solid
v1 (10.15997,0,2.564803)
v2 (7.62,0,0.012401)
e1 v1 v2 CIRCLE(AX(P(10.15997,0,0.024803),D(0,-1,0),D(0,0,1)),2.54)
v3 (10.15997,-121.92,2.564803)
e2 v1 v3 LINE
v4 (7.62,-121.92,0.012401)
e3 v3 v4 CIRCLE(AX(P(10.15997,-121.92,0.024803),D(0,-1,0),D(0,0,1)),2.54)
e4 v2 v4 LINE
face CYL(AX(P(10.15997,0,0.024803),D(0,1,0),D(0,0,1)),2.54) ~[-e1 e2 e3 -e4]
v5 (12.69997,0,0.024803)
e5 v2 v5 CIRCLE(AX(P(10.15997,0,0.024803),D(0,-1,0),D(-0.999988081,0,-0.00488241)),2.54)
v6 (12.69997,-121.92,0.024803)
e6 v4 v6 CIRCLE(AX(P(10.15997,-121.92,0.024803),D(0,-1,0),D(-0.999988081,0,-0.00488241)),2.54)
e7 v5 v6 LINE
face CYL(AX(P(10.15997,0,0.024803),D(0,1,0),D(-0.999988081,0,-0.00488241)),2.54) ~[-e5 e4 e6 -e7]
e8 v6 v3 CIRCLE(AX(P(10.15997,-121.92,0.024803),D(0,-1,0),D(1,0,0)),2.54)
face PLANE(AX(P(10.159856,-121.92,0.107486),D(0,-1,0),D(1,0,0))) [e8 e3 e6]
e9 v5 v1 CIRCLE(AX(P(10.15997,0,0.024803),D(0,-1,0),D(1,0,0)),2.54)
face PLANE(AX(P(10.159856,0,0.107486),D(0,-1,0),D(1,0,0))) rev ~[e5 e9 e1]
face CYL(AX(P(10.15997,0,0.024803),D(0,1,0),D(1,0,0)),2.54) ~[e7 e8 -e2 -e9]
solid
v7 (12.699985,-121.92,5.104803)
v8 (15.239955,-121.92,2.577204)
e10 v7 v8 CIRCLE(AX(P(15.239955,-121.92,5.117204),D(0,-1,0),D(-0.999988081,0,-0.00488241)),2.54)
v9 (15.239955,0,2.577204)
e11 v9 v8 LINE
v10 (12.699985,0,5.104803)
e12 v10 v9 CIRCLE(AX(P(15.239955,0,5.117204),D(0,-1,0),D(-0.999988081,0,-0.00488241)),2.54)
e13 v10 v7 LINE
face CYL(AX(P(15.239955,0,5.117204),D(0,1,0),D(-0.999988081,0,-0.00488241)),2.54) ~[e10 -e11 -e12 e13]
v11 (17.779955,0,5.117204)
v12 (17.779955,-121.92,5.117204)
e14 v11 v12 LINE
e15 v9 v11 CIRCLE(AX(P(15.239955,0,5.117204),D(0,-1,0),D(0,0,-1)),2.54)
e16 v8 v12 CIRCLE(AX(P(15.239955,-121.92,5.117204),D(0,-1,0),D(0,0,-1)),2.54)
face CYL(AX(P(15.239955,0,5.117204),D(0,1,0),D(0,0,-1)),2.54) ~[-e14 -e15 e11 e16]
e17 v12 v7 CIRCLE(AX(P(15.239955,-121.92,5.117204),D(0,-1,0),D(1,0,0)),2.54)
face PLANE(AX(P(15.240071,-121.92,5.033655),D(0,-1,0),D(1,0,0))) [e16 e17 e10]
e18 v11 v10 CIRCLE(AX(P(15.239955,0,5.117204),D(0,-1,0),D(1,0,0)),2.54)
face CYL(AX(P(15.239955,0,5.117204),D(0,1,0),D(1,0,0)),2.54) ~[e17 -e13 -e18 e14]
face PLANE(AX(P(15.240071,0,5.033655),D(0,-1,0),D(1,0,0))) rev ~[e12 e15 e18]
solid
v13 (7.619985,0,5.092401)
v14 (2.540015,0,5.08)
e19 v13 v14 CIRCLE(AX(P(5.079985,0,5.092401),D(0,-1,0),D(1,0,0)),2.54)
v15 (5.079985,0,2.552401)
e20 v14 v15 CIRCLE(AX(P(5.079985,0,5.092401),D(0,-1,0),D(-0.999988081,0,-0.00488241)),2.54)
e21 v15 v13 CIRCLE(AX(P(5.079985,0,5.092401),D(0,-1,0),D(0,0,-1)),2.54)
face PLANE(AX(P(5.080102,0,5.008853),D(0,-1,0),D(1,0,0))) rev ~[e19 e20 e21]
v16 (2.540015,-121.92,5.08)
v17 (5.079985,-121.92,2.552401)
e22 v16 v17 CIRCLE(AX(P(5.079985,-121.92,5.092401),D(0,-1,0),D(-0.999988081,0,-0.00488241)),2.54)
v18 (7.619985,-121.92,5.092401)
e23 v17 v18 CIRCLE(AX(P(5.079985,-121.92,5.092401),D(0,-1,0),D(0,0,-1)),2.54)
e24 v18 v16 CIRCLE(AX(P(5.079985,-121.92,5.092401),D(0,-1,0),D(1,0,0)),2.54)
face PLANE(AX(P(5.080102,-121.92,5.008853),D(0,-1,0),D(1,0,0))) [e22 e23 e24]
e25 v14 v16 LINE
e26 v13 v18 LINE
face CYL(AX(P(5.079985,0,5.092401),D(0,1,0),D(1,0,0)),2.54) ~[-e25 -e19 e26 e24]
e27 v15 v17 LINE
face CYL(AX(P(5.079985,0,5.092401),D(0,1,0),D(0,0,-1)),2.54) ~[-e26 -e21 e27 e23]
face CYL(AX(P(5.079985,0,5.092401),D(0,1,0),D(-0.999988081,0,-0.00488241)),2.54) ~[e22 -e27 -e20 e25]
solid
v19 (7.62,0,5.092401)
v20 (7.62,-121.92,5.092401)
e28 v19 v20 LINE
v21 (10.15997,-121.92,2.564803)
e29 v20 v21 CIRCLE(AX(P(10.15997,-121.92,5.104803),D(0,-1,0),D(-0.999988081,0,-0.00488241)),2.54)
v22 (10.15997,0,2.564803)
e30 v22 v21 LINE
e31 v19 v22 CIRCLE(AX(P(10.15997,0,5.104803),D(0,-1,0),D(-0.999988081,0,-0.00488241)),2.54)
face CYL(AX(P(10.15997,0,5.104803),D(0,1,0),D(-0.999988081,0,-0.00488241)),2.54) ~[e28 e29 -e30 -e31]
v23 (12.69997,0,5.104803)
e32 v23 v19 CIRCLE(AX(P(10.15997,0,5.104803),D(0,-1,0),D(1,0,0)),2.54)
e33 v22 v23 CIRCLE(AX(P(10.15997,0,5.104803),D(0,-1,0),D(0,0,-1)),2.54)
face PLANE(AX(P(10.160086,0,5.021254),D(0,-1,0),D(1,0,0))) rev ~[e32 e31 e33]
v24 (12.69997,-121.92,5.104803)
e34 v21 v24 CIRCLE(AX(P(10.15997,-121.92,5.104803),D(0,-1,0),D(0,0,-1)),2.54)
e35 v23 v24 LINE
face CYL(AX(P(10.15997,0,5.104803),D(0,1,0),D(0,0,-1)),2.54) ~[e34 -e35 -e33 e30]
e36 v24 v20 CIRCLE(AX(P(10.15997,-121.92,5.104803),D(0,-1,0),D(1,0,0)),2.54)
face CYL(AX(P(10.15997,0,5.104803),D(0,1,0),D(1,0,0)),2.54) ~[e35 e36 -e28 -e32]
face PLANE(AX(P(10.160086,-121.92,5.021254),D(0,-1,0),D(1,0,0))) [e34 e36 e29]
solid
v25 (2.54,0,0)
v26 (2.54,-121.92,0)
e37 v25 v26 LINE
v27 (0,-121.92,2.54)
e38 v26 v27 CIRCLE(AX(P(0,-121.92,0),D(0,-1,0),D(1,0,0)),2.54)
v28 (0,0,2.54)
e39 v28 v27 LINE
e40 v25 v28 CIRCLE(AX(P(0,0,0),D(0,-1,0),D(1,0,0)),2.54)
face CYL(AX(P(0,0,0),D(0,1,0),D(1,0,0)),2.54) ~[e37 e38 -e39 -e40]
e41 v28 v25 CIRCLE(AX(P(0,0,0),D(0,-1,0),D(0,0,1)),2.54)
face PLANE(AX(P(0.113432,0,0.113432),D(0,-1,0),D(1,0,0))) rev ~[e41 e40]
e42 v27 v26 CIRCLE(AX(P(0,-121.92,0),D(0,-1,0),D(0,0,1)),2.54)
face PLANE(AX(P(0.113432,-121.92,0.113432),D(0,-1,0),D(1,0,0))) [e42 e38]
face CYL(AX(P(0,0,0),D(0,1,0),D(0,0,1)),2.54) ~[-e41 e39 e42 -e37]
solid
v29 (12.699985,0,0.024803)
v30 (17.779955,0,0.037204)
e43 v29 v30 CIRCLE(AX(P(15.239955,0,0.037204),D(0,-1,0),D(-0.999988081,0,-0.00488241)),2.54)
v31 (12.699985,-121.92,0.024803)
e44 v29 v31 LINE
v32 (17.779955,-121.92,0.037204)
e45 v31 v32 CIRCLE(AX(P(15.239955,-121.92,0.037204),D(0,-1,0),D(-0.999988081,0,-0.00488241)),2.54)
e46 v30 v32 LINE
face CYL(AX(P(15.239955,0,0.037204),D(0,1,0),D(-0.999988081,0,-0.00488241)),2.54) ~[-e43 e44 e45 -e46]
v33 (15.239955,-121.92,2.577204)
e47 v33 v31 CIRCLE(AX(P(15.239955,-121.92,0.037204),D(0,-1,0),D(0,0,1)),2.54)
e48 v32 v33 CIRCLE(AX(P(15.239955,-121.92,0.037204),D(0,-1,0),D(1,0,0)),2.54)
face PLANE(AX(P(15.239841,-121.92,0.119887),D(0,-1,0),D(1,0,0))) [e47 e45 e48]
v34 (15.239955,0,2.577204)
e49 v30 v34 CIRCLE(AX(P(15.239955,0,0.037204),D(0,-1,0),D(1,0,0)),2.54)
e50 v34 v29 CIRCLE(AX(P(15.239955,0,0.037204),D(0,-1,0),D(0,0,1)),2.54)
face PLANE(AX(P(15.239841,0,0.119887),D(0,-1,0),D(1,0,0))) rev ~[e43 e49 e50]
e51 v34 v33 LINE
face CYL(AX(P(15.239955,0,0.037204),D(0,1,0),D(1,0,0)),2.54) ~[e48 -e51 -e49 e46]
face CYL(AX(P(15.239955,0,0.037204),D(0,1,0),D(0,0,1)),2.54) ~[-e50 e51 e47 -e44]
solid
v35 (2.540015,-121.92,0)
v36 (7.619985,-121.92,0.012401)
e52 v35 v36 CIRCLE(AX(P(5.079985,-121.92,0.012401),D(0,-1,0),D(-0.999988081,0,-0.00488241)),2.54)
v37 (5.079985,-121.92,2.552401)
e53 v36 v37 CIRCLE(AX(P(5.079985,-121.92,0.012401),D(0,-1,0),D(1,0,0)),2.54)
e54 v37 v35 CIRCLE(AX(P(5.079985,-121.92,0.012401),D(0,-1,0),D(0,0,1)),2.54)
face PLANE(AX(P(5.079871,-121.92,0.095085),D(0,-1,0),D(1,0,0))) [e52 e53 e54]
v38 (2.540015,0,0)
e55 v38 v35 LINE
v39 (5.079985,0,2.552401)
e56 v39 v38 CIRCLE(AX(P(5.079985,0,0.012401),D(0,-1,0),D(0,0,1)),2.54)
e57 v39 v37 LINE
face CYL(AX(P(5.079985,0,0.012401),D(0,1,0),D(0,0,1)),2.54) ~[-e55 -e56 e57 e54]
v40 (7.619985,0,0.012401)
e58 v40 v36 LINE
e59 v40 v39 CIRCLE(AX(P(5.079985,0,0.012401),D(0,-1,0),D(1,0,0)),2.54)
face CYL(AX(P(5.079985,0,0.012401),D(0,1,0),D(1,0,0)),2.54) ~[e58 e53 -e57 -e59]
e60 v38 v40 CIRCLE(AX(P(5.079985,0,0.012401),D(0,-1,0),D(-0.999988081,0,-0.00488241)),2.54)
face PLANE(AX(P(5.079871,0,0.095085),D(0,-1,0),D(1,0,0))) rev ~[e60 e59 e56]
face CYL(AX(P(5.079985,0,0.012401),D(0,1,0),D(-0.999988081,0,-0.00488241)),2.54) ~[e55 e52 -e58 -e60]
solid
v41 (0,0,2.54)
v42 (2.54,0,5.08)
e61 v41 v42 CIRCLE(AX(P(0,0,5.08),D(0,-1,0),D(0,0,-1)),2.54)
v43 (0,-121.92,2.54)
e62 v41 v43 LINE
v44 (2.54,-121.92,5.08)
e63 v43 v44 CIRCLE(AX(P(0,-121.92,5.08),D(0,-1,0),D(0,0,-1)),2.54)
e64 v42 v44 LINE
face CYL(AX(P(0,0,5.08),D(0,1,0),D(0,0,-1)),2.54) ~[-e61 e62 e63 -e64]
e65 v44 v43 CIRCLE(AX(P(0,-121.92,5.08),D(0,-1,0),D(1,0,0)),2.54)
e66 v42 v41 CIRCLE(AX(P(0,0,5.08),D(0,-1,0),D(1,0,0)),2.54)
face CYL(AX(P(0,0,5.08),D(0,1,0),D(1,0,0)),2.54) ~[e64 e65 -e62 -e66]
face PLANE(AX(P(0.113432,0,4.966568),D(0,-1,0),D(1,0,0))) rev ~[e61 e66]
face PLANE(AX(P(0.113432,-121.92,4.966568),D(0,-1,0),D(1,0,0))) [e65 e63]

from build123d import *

# Parameters (mm, degrees)
F1_DEPTH = 121.92


with BuildPart() as f1:
    # F0 (on Front) → F1 (new body)
    with BuildSketch(Plane.XZ):
        with BuildLine():
            ThreePointArc((0, 2.54), (-1.7960512242, -1.7960512242), (2.54, 0))
            ThreePointArc((2.54, 0), (1.7960512242, 1.7960512242), (0, 2.54))
        make_face()
    extrude(amount=F1_DEPTH)


with BuildPart() as f1b:
    # F0 (on Front) → F1, piece 2 (new body)
    with BuildSketch(Plane.XZ):
        with BuildLine():
            ThreePointArc((2.54, 5.08), (-1.7960512242, 6.8760512242), (0, 2.54))
            ThreePointArc((0, 2.54), (1.7960512242, 3.2839487758), (2.54, 5.08))
        make_face()
    extrude(amount=F1_DEPTH)


with BuildPart() as f1c:
    # F0 (on Front) → F1, piece 3 (new body)
    with BuildSketch(Plane.XZ):
        with BuildLine():
            ThreePointArc((15.2399545881, 2.577204187), (13.4395241733, 1.828865517), (12.6999848625, 0.0248028653))
            ThreePointArc((12.6999848625, 0.0248028653), (15.2461552675, -2.5027882444), (17.7799545881, 0.037204187))
            ThreePointArc((17.7799545881, 0.037204187), (17.0360058124, 1.8332554112), (15.2399545881, 2.577204187))
        make_face()
    extrude(amount=F1_DEPTH)


with BuildPart() as f1d:
    # F0 (on Front) → F1, piece 4 (new body)
    with BuildSketch(Plane.XZ):
        with BuildLine():
            ThreePointArc((12.6999848625, 5.1048028653), (13.4482932582, 3.3167737722), (15.2399545881, 2.577204187))
            ThreePointArc((15.2399545881, 2.577204187), (17.0360058124, 3.3211529628), (17.7799545881, 5.117204187))
            ThreePointArc((17.7799545881, 5.117204187), (15.2337539088, 7.6571966184), (12.6999848625, 5.1048028653))
        make_face()
    extrude(amount=F1_DEPTH)


with BuildPart() as f1e:
    # F0 (on Front) → F1, piece 5 (new body)
    with BuildSketch(Plane.XZ):
        with BuildLine():
            ThreePointArc((5.0799848627, 2.5524013957), (3.2795544479, 1.8040627257), (2.5400151371, 7.39e-08))
            ThreePointArc((2.5400151371, 7.39e-08), (5.0861855421, -2.5275910357), (7.6199848627, 0.0124013957))
            ThreePointArc((7.6199848627, 0.0124013957), (6.8760360869, 1.8084526199), (5.0799848627, 2.5524013957))
        make_face()
    extrude(amount=F1_DEPTH)


with BuildPart() as f1f:
    # F0 (on Front) → F1, piece 6 (new body)
    with BuildSketch(Plane.XZ):
        with BuildLine():
            ThreePointArc((2.5400151371, 5.0800000739), (3.2883235327, 3.2919709808), (5.0799848627, 2.5524013957))
            ThreePointArc((5.0799848627, 2.5524013957), (6.8760360869, 3.2963501715), (7.6199848627, 5.0924013957))
            ThreePointArc((7.6199848627, 5.0924013957), (5.0737841834, 7.6323938271), (2.5400151371, 5.0800000739))
        make_face()
    extrude(amount=F1_DEPTH)


with BuildPart() as f1g:
    # F0 (on Front) → F1, piece 7 (new body)
    with BuildSketch(Plane.XZ):
        with BuildLine():
            ThreePointArc((10.1599697254, 2.5648027913), (8.3595393106, 1.8164641213), (7.6199999998, 0.0124014696))
            ThreePointArc((7.6199999998, 0.0124014696), (10.1661704048, -2.5151896401), (12.6999697254, 0.0248027913))
            ThreePointArc((12.6999697254, 0.0248027913), (11.9560209496, 1.8208540156), (10.1599697254, 2.5648027913))
        make_face()
    extrude(amount=F1_DEPTH)


with BuildPart() as f1h:
    # F0 (on Front) → F1, piece 8 (new body)
    with BuildSketch(Plane.XZ):
        with BuildLine():
            ThreePointArc((7.6199999998, 5.0924014696), (8.3683083954, 3.3043723765), (10.1599697254, 2.5648027913))
            ThreePointArc((10.1599697254, 2.5648027913), (11.9560209496, 3.3087515671), (12.6999697254, 5.1048027913))
            ThreePointArc((12.6999697254, 5.1048027913), (10.1537690461, 7.6447952228), (7.6199999998, 5.0924014696))
        make_face()
    extrude(amount=F1_DEPTH)


solid = Compound([f1.part, f1b.part, f1c.part, f1d.part, f1e.part, f1f.part, f1g.part, f1h.part])
